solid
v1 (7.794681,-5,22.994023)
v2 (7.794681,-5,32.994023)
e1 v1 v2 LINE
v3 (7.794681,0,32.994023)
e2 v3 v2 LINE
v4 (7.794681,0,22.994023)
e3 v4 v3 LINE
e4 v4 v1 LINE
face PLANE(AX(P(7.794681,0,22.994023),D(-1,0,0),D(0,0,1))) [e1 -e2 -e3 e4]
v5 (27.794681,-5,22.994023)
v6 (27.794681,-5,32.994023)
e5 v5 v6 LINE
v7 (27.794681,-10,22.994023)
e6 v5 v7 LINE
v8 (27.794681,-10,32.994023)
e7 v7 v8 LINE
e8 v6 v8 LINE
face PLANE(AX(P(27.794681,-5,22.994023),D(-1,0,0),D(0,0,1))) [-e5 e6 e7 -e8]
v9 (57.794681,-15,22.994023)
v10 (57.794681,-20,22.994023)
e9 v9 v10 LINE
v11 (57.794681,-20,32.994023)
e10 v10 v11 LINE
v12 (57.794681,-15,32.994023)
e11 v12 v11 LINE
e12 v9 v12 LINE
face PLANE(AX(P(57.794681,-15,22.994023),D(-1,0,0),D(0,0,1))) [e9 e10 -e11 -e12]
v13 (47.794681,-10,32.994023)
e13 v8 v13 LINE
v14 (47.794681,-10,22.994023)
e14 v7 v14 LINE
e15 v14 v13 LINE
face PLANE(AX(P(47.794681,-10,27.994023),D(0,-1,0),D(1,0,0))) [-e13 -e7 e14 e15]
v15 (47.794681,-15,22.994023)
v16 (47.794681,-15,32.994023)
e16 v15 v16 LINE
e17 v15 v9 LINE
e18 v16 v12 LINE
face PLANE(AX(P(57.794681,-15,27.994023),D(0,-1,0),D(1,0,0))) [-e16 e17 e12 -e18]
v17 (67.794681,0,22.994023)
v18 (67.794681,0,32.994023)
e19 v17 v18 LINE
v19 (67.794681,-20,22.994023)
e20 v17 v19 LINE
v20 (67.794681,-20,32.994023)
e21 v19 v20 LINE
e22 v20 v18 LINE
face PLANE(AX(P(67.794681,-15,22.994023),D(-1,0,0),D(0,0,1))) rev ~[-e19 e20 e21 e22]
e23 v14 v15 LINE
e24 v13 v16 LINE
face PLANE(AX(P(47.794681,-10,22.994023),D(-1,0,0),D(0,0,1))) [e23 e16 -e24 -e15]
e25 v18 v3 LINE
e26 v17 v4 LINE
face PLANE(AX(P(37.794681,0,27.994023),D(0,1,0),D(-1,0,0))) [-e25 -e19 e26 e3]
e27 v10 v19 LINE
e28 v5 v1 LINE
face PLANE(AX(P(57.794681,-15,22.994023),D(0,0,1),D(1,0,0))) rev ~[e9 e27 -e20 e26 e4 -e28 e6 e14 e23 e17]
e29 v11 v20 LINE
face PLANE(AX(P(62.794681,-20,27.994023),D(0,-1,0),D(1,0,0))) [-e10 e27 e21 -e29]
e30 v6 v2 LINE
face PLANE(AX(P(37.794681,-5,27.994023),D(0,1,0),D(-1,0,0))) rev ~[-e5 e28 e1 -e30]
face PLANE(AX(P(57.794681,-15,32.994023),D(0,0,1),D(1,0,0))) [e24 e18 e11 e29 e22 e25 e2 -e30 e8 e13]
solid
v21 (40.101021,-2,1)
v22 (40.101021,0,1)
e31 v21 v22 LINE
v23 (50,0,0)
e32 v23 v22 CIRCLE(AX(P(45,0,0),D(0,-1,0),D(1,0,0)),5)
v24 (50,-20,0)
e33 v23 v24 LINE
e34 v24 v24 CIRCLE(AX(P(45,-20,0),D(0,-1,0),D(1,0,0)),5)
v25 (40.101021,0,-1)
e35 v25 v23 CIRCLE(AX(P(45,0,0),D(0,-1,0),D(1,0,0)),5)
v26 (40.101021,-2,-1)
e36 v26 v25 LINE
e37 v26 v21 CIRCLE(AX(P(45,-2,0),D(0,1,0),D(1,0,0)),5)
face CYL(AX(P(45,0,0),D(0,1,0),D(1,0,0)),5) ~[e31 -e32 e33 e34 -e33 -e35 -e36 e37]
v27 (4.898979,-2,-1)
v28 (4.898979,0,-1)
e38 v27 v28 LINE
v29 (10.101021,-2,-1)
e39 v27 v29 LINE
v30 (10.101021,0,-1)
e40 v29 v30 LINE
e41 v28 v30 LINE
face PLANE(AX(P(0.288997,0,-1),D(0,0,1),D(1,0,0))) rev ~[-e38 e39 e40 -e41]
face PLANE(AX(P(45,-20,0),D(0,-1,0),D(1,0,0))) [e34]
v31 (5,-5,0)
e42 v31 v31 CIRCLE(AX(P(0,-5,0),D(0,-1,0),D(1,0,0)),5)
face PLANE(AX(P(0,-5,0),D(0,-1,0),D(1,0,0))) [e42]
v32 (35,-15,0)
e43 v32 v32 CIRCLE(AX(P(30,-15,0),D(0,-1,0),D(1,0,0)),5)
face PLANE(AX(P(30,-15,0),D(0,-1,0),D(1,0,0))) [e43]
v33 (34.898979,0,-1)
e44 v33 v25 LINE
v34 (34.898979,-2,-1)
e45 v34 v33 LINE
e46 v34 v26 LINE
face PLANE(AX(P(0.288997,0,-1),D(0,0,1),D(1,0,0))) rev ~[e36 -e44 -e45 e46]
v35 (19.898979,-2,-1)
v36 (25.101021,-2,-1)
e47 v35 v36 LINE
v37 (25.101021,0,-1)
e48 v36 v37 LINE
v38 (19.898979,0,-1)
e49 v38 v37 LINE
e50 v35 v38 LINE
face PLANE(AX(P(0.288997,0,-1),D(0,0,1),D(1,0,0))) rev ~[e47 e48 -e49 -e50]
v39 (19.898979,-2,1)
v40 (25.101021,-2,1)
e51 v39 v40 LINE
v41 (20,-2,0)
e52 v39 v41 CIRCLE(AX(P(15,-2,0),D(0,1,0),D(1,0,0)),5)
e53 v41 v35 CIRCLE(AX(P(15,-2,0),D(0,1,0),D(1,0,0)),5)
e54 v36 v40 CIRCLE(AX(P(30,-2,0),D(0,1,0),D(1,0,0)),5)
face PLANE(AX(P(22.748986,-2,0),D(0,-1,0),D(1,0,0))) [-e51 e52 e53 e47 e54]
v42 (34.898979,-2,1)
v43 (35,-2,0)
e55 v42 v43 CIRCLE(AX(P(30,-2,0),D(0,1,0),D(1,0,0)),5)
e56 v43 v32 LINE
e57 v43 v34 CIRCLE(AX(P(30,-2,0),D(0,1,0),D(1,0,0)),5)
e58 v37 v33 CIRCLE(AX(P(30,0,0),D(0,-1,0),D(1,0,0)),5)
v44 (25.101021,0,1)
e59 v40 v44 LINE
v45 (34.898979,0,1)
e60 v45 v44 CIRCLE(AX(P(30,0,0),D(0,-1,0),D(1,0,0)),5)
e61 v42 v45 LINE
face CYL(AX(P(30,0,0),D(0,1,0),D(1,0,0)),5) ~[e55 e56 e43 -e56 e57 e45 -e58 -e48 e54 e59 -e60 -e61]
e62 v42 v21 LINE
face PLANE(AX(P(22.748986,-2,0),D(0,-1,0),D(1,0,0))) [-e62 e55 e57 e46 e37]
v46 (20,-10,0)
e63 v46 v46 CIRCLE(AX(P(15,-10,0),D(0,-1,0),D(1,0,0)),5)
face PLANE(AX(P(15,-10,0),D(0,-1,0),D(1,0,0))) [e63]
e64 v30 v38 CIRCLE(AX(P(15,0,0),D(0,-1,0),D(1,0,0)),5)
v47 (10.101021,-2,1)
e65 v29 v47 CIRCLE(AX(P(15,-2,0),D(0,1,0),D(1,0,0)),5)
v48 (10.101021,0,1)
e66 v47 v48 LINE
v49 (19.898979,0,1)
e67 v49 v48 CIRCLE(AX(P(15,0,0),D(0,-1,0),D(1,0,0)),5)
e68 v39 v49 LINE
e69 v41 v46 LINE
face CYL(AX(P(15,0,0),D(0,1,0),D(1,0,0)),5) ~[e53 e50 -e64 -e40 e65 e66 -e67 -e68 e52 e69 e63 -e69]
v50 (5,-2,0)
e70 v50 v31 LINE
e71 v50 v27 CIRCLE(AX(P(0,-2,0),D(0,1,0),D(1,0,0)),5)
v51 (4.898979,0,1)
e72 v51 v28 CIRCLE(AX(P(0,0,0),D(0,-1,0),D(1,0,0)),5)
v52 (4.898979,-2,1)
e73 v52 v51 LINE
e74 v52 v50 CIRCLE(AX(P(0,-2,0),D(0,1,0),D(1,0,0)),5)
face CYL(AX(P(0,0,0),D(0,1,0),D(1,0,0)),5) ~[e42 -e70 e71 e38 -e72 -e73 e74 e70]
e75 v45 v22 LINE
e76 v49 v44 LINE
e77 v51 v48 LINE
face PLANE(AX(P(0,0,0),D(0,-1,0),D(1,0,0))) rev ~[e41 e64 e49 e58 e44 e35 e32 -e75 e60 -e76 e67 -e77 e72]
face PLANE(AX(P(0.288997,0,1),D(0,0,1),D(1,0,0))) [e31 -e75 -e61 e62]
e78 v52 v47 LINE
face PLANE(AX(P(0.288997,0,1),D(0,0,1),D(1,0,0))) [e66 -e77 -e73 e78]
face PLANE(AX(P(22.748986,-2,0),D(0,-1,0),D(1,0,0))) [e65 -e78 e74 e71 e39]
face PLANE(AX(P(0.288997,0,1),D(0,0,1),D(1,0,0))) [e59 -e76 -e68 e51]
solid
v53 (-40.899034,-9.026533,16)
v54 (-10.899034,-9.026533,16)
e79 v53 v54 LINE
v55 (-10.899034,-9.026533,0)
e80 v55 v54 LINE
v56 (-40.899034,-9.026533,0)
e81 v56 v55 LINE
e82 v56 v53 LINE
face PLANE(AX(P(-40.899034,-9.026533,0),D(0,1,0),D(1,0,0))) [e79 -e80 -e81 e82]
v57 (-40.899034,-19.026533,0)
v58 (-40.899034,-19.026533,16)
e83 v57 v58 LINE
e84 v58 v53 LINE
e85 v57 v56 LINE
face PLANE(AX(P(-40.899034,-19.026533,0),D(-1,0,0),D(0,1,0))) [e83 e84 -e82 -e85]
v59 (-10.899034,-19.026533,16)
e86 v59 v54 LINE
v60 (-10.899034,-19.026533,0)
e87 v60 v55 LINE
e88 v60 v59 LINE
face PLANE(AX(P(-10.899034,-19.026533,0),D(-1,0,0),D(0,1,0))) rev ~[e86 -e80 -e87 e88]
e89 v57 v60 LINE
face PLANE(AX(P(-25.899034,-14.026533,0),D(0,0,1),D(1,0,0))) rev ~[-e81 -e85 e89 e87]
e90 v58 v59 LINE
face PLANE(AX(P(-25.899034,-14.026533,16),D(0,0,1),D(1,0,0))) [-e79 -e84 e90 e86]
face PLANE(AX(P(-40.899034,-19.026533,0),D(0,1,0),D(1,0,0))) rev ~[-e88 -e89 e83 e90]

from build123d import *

# Parameters (mm, degrees)
F0_R      = 5
F1_DEPTH  = 5
F2_DEPTH  = 10
F3_DEPTH  = 15
F4_DEPTH  = 20
F7_W      = 60
F7_H      = 10
F8_DEPTH  = 5
F9_W      = 40
F9_H      = 10
F10_DEPTH = 5
F11_W     = 20
F11_H     = 10
F12_DEPTH = 5
F13_W     = 10
F13_H     = 10
F14_DEPTH = 5
F15_W     = 44.9199787766
F15_H     = 2
F16_DEPTH = 2
F17_W     = 30
F17_H     = 10
F18_DEPTH = 16


# Not quite as in the source:
# - a feature names something its author has since deleted; it is built from what else it names


with BuildPart() as f1:
    # F0 (on Front) → F1 (new body)
    with BuildSketch(Plane.XZ):
        Circle(F0_R)
    extrude(amount=F1_DEPTH)


with BuildPart() as f2:
    # F0 (on Front) → F2 (new body)
    with BuildSketch(Plane.XZ):
        with Locations((15, 0)):
            Circle(F0_R)
    extrude(amount=F2_DEPTH)


with BuildPart() as f3:
    # F0 (on Front) → F3 (new body)
    with BuildSketch(Plane.XZ):
        with Locations((30, 0)):
            Circle(F0_R)
    extrude(amount=F3_DEPTH)


with BuildPart() as f4:
    # F0 (on Front) → F4 (new body)
    with BuildSketch(Plane.XZ):
        with Locations((45, 0)):
            Circle(F0_R)
    extrude(amount=F4_DEPTH)

    # F6: union F3, F2, F1
    add(f3.part)
    add(f2.part)
    add(f1.part)

    # F15 (on face) → F16 (join)
    with BuildSketch(Plane.XZ):
        with Locations((22.7489862844, 0)):
            Rectangle(F15_W, F15_H)
    extrude(amount=F16_DEPTH)


with BuildPart() as f8:
    # F7 (on face) → F8 (new body)
    with BuildSketch(Plane(origin=(0, 0, 0), x_dir=(-1, 0, 0), z_dir=(0, 1, 0))):
        with Locations((-37.7946806746, 27.9940228151)):
            Rectangle(F7_W, F7_H)
    extrude(amount=-F8_DEPTH)

    # F9 (on face) → F10 (join)
    with BuildSketch(Plane.XZ.offset(5)):
        with Locations((47.7946806746, 27.9940228151)):
            Rectangle(F9_W, F9_H)
    extrude(amount=F10_DEPTH)

    # F11 (on face) → F12 (join)
    with BuildSketch(Plane.XZ.offset(10)):
        with Locations((57.7946806746, 27.9940228151)):
            Rectangle(F11_W, F11_H)
    extrude(amount=F12_DEPTH)

    # F13 (on face) → F14 (join)
    with BuildSketch(Plane.XZ.offset(15)):
        with Locations((62.7946806746, 27.9940228151)):
            Rectangle(F13_W, F13_H)
    extrude(amount=F14_DEPTH)


with BuildPart() as f18:
    # F17 (on Top) → F18 (new body)
    with BuildSketch(Plane.XY):
        with Locations((-25.8990339628, -14.026532881)):
            Rectangle(F17_W, F17_H)
    extrude(amount=F18_DEPTH)


solid = Compound([f4.part, f8.part, f18.part])
